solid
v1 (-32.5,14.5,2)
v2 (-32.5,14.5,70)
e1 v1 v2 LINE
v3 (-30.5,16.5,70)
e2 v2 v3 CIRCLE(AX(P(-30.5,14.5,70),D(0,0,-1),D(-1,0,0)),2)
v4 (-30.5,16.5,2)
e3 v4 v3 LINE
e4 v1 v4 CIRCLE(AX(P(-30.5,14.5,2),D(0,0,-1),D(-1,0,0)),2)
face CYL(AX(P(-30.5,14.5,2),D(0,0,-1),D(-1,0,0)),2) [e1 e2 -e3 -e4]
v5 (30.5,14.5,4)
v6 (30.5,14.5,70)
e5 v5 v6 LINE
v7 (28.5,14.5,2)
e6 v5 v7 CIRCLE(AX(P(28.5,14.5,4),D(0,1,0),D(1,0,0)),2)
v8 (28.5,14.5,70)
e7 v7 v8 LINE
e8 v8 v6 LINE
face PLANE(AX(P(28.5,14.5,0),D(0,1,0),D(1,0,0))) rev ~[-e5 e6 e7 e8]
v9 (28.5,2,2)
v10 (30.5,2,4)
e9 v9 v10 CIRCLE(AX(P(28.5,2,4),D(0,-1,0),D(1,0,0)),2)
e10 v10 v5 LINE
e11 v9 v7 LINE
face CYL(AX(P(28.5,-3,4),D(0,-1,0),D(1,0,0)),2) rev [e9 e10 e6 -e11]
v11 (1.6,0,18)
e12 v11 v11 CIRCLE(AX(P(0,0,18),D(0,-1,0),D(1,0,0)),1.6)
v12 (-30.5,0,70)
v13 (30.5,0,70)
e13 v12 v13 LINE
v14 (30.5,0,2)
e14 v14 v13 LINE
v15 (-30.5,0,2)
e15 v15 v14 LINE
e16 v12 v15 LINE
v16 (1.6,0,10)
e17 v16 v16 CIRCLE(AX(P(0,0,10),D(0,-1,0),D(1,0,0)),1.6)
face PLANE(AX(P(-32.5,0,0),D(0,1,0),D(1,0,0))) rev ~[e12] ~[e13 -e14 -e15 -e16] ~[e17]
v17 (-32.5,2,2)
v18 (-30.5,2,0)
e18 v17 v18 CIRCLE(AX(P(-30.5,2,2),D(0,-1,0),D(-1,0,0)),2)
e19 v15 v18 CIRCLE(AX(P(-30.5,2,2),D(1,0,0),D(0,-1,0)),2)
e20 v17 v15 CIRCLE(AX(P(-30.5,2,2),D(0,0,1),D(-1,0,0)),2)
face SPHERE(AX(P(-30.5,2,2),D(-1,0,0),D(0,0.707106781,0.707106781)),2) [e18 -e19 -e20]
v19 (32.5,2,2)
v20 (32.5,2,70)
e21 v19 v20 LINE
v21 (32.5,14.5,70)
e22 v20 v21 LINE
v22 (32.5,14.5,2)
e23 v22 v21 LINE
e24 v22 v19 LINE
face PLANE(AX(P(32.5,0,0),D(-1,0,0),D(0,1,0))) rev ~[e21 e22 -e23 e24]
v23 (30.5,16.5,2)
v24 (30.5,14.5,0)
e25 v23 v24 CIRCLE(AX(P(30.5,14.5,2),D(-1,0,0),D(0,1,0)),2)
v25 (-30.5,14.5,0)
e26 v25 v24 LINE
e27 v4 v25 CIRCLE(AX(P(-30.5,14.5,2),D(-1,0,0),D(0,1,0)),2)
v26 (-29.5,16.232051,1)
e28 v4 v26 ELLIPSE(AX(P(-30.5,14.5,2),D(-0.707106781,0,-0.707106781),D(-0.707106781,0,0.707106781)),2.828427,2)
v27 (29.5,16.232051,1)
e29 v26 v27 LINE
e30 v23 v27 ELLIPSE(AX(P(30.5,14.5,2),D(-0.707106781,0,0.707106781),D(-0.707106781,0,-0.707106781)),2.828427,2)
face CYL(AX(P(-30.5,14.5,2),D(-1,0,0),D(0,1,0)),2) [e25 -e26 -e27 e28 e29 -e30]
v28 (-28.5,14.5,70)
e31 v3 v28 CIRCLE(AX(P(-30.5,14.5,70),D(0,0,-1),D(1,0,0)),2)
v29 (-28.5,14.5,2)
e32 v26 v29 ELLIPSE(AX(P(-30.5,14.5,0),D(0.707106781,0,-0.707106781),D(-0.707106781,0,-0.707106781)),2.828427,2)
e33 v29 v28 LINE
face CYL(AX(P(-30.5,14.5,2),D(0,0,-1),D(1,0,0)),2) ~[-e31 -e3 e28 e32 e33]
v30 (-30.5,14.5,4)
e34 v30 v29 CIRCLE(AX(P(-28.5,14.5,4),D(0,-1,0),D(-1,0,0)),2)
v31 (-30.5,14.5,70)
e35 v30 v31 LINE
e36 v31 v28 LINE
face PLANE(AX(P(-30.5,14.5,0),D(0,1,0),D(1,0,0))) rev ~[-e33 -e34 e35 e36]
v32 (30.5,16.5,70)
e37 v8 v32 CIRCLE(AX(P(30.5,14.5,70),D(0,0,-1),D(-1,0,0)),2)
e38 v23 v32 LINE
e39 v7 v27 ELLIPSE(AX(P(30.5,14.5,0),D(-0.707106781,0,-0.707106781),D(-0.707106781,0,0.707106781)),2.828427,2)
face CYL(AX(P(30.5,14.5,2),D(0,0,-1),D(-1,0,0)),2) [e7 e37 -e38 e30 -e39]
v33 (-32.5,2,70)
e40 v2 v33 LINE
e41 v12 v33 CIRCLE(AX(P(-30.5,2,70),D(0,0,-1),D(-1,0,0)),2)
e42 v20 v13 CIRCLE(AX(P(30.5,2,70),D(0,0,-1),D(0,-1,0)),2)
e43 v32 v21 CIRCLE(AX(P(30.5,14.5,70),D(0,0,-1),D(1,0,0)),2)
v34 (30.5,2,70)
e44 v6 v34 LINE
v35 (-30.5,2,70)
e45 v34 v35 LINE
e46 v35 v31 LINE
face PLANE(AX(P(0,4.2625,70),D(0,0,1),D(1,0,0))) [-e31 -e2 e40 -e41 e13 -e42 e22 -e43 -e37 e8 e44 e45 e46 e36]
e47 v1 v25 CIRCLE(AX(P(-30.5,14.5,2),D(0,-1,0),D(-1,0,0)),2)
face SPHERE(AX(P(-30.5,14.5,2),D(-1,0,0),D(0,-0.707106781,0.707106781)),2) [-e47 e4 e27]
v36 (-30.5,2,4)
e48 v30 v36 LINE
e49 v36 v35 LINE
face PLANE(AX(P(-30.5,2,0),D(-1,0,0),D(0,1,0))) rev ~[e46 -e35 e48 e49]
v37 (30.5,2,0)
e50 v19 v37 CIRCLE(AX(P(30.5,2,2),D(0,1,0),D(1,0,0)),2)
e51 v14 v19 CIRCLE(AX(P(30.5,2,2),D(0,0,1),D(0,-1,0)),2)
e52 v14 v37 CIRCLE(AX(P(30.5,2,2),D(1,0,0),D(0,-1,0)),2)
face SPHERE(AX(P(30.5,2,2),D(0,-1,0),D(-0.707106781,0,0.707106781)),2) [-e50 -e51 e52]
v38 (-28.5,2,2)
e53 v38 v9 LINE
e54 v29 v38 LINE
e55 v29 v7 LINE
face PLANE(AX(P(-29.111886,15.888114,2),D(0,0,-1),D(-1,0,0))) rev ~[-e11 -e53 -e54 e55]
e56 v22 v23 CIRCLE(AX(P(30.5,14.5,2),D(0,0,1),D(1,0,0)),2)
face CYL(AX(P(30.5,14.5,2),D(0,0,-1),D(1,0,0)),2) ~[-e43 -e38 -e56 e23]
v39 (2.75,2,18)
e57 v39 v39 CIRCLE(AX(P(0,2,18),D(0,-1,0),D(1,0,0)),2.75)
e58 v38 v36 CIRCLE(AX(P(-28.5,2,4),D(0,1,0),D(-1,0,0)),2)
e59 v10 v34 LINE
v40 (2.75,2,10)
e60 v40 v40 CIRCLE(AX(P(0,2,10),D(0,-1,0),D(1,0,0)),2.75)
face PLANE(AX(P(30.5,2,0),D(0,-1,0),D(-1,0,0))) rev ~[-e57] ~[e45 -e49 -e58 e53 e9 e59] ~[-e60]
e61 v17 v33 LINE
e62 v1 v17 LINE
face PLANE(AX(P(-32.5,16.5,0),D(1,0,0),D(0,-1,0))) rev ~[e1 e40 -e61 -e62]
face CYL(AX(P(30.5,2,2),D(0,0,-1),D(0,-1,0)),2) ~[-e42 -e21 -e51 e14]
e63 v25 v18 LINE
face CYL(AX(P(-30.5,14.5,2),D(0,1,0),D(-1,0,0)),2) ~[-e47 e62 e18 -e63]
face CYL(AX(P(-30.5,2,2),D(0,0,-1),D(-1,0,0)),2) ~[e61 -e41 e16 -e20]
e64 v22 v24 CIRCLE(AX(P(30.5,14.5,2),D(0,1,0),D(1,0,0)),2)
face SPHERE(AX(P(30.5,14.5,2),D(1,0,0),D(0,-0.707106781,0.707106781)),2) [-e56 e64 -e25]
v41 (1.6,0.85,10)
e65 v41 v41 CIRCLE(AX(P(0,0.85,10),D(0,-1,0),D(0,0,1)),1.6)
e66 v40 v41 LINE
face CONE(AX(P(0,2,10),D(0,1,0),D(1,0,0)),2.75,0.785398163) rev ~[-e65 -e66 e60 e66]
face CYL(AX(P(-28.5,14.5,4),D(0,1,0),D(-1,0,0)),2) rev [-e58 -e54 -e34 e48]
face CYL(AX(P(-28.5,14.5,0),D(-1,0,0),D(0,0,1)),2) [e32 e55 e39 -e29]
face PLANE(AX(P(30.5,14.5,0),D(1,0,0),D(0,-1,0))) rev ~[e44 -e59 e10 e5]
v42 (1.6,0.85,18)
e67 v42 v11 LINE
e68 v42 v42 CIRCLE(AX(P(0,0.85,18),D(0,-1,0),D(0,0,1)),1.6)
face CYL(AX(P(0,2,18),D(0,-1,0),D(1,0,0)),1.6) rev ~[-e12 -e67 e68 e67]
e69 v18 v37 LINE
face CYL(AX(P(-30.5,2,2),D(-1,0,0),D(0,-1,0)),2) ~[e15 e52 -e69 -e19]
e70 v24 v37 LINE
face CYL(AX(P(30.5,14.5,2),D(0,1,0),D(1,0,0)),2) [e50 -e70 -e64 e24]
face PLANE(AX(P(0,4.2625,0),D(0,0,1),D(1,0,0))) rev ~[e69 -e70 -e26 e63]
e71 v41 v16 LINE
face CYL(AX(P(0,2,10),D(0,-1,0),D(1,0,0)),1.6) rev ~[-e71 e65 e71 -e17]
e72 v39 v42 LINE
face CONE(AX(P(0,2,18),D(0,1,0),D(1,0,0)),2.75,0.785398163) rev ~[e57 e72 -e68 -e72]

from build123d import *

# Parameters (mm, degrees)
F0_DEPTH       = 70
F1_W           = 65
F1_H           = 16.5
F8_DEPTH       = 2
F2_T1_DEPTH    = 12.5
F2_T3_DEPTH    = 73
F2_T5_DEPTH    = 57
F2_T7_DEPTH    = 61
F2_S11_W       = 2.04
F2_S11_H       = 2.04
F2_T12_DEPTH   = 2.04
F2_S17_W       = 2.04
F2_S17_H       = 2.04
F2_T18_DEPTH   = 2.04
F2_S23_W       = 2.04
F2_S23_H       = 2.04
F2_T24_DEPTH   = 2.04
F2_S29_W       = 2.04
F2_S29_H       = 2.04
F2_T30_DEPTH   = 2.04
F2_T37_DEPTH   = 73
F2_T42_DEPTH   = 62
F2_T50_DEPTH   = 62
F2_T55_DEPTH   = 73
F2_T62_DEPTH   = 17.5
F2_T67_DEPTH   = 17.5
F5_D           = 3.2
F5_CSINK_D     = 5.5
F5_CSINK_ANGLE = 90
F6_D           = 3.2
F6_CSINK_D     = 5.5
F6_CSINK_ANGLE = 90


# Not quite as in the source:
# - a fillet or chamfer that OpenCascade refuses, or shapes differently, is made with other operations: its cross-section is extruded or revolved along the edge and cut away or added
# - a feature names something its author has since deleted; it is built from what else it names


with BuildPart() as f0:
    # F7 (on Top) → F0 (new body)
    with BuildSketch(Plane.XY):
        Polygon((-32.5, 16.5), (-32.5, 0), (32.5, 0), (32.5, 16.5), (28.5, 16.5), (28.5, 14.5), (30.5, 14.5), (30.5, 2), (-30.5, 2), (-30.5, 14.5), (-28.5, 14.5), (-28.5, 16.5), align=None)
    extrude(amount=F0_DEPTH)

    # F1 (on face) → F8 (join)
    with BuildSketch(Plane(origin=(0, 0, 0), x_dir=(1, 0, 0), z_dir=(0, 0, -1))):
        with Locations((0, -8.25)):
            Rectangle(F1_W, F1_H)
    extrude(amount=-F8_DEPTH)

    # F2: fillet of radius 2 on 13 edges, made by hand

    # F2_s2 → F2_t1 (cut)
    with BuildSketch(Plane.XZ.offset(-14.5)):
        with BuildLine():
            ThreePointArc((32.5, 2), (31.9142135624, 0.5857864376), (30.5, 0))
            Line((30.5, 0), (32.5, 0))
            Line((32.5, 0), (32.5, 2))
        make_face()
        with BuildLine():
            ThreePointArc((-32.5, 2), (-31.9142135624, 0.5857864376), (-30.5, 0))
            Line((-30.5, 0), (-32.5, 0))
            Line((-32.5, 0), (-32.5, 2))
        make_face()
    extrude(amount=F2_T1_DEPTH, mode=Mode.SUBTRACT)

    # F2_s4 → F2_t3 (cut)
    with BuildSketch(Plane.XY.offset(2)):
        with BuildLine():
            ThreePointArc((-32.5, 2), (-31.9142135624, 0.5857864376), (-30.5, 0))
            Line((-30.5, 0), (-32.5, 0))
            Line((-32.5, 0), (-32.5, 2))
        make_face()
        with BuildLine():
            ThreePointArc((30.5, 0), (31.9142135624, 0.5857864376), (32.5, 2))
            Line((32.5, 2), (32.5, 0))
            Line((32.5, 0), (30.5, 0))
        make_face()
        with BuildLine():
            ThreePointArc((-32.5, 14.5), (-31.9142135624, 15.9142135624), (-30.5, 16.5))
            Line((-30.5, 16.5), (-32.5, 16.5))
            Line((-32.5, 16.5), (-32.5, 14.5))
        make_face()
        with BuildLine():
            ThreePointArc((32.5, 14.5), (31.9142135624, 15.9142135624), (30.5, 16.5))
            Line((30.5, 16.5), (32.5, 16.5))
            Line((32.5, 16.5), (32.5, 14.5))
        make_face()
        with BuildLine():
            ThreePointArc((-28.5, 14.5), (-29.0857864376, 15.9142135624), (-30.5, 16.5))
            Line((-30.5, 16.5), (-28.5, 16.5))
            Line((-28.5, 16.5), (-28.5, 14.5))
        make_face()
        with BuildLine():
            ThreePointArc((28.5, 14.5), (29.0857864376, 15.9142135624), (30.5, 16.5))
            Line((30.5, 16.5), (28.5, 16.5))
            Line((28.5, 16.5), (28.5, 14.5))
        make_face()
    extrude(amount=F2_T3_DEPTH, mode=Mode.SUBTRACT)

    # F2_s6 → F2_t5 (cut)
    with BuildSketch(Plane.YZ.offset(-28.5)):
        with BuildLine():
            ThreePointArc((14.5, 2), (15.9142135624, 1.4142135624), (16.5, 0))
            Line((16.5, 0), (16.5, 2))
            Line((16.5, 2), (14.5, 2))
        make_face()
    extrude(amount=F2_T5_DEPTH, mode=Mode.SUBTRACT)

    # F2_s8 → F2_t7 (cut)
    with BuildSketch(Plane.YZ.offset(-30.5)):
        with BuildLine():
            ThreePointArc((0, 2), (0.5857864376, 0.5857864376), (2, 0))
            Line((2, 0), (0, 0))
            Line((0, 0), (0, 2))
        make_face()
        with BuildLine():
            ThreePointArc((16.5, 2), (15.9142135624, 0.5857864376), (14.5, 0))
            Line((14.5, 0), (16.5, 0))
            Line((16.5, 0), (16.5, 2))
        make_face()
    extrude(amount=F2_T7_DEPTH, mode=Mode.SUBTRACT)


with BuildPart() as f2_tool10:
    # F2_s11 → F2_t12 (new body)
    with BuildSketch(Plane.XZ.offset(-2)):
        with Locations((31.52, 0.98)):
            Rectangle(F2_S11_W, F2_S11_H)
    extrude(amount=F2_T12_DEPTH)

    # F2_s13 → F2_t14 (revolve, cut)
    with BuildSketch(Plane(origin=(30.5, 2, 2), x_dir=(-0.7071067812, 0, 0.7071067812), z_dir=(0.7071067812, 0, 0.7071067812))):
        with BuildLine():
            ThreePointArc((0, -2), (2, 0), (0, 2))
            Line((0, 2), (0, -2))
        make_face()
    revolve(axis=Axis((30.5, 2, 2), (0, -1, 0)), mode=Mode.SUBTRACT)


with BuildPart() as f0_1:
    add(f0.part)

    # F2_t9: cut F2_tool10
    add(f2_tool10.part, mode=Mode.SUBTRACT)


with BuildPart() as f2_tool16:
    # F2_s17 → F2_t18 (new body)
    with BuildSketch(Plane.YZ.offset(30.5)):
        with Locations((15.52, 0.98)):
            Rectangle(F2_S17_W, F2_S17_H)
    extrude(amount=F2_T18_DEPTH)

    # F2_s19 → F2_t20 (revolve, cut)
    with BuildSketch(Plane(origin=(30.5, 14.5, 2), x_dir=(0, -0.7071067812, 0.7071067812), z_dir=(0, 0.7071067812, 0.7071067812))):
        with BuildLine():
            ThreePointArc((0, -2), (2, 0), (0, 2))
            Line((0, 2), (0, -2))
        make_face()
    revolve(axis=Axis((30.5, 14.5, 2), (1, 0, 0)), mode=Mode.SUBTRACT)


with BuildPart() as f0_2:
    add(f0_1.part)

    # F2_t15: cut F2_tool16
    add(f2_tool16.part, mode=Mode.SUBTRACT)


with BuildPart() as f2_tool22:
    # F2_s23 → F2_t24 (new body)
    with BuildSketch(Plane.YZ.offset(-30.5)):
        with Locations((15.52, 0.98)):
            Rectangle(F2_S23_W, F2_S23_H)
    extrude(amount=-F2_T24_DEPTH)

    # F2_s25 → F2_t26 (revolve, cut)
    with BuildSketch(Plane(origin=(-30.5, 14.5, 2), x_dir=(0, -0.7071067812, 0.7071067812), z_dir=(0, -0.7071067812, -0.7071067812))):
        with BuildLine():
            ThreePointArc((0, -2), (2, 0), (0, 2))
            Line((0, 2), (0, -2))
        make_face()
    revolve(axis=Axis((-30.5, 14.5, 2), (-1, 0, 0)), mode=Mode.SUBTRACT)


with BuildPart() as f0_3:
    add(f0_2.part)

    # F2_t21: cut F2_tool22
    add(f2_tool22.part, mode=Mode.SUBTRACT)


with BuildPart() as f2_tool28:
    # F2_s29 → F2_t30 (new body)
    with BuildSketch(Plane.YZ.offset(-30.5)):
        with Locations((0.98, 0.98)):
            Rectangle(F2_S29_W, F2_S29_H)
    extrude(amount=-F2_T30_DEPTH)

    # F2_s31 → F2_t32 (revolve, cut)
    with BuildSketch(Plane(origin=(-30.5, 2, 2), x_dir=(0, 0.7071067812, 0.7071067812), z_dir=(0, -0.7071067812, 0.7071067812))):
        with BuildLine():
            ThreePointArc((0, -2), (2, 0), (0, 2))
            Line((0, 2), (0, -2))
        make_face()
    revolve(axis=Axis((-30.5, 2, 2), (-1, 0, 0)), mode=Mode.SUBTRACT)


with BuildPart() as f0_4:
    add(f0_3.part)

    # F2_t27: cut F2_tool28
    add(f2_tool28.part, mode=Mode.SUBTRACT)


with BuildPart() as f2_tool35:
    # F2_s36 → F2_t37 (new body)
    with BuildSketch(Plane.XY.offset(-3)):
        with BuildLine():
            ThreePointArc((-28.5, 14.5), (-29.0857864376, 15.9142135624), (-30.5, 16.5))
            Line((-30.5, 16.5), (-28.5, 16.5))
            Line((-28.5, 16.5), (-28.5, 14.5))
        make_face()
    extrude(amount=F2_T37_DEPTH)

    split(bisect_by=Plane.XY.offset(2), keep=Keep.BOTTOM)

    split(bisect_by=Plane.XY, keep=Keep.TOP)


with BuildPart() as f2_tool40:
    # F2_s41 → F2_t42 (new body)
    with BuildSketch(Plane.YZ.offset(-33.5)):
        with BuildLine():
            ThreePointArc((14.5, 2), (15.9142135624, 1.4142135624), (16.5, 0))
            Line((16.5, 0), (16.5, 2))
            Line((16.5, 2), (14.5, 2))
        make_face()
    extrude(amount=F2_T42_DEPTH)

    split(bisect_by=Plane.YZ.offset(-28.5), keep=Keep.BOTTOM)

    split(bisect_by=Plane.YZ.offset(-30.5), keep=Keep.TOP)


with BuildPart() as f2_tool35_1:
    add(f2_tool35.part)

    # F2_t45: intersect F2_tool40
    add(f2_tool40.part, mode=Mode.INTERSECT)


with BuildPart() as f0_5:
    add(f0_4.part)

    # F2_t33: cut F2_tool35
    add(f2_tool35_1.part, mode=Mode.SUBTRACT)


with BuildPart() as f2_tool48:
    # F2_s49 → F2_t50 (new body)
    with BuildSketch(Plane.YZ.offset(-28.5)):
        with BuildLine():
            ThreePointArc((14.5, 2), (15.9142135624, 1.4142135624), (16.5, 0))
            Line((16.5, 0), (16.5, 2))
            Line((16.5, 2), (14.5, 2))
        make_face()
    extrude(amount=F2_T50_DEPTH)

    split(bisect_by=Plane.YZ.offset(30.5), keep=Keep.BOTTOM)

    split(bisect_by=Plane.YZ.offset(28.5), keep=Keep.TOP)


with BuildPart() as f2_tool53:
    # F2_s54 → F2_t55 (new body)
    with BuildSketch(Plane.XY.offset(-3)):
        with BuildLine():
            ThreePointArc((28.5, 14.5), (29.0857864376, 15.9142135624), (30.5, 16.5))
            Line((30.5, 16.5), (28.5, 16.5))
            Line((28.5, 16.5), (28.5, 14.5))
        make_face()
    extrude(amount=F2_T55_DEPTH)

    split(bisect_by=Plane.XY.offset(2), keep=Keep.BOTTOM)

    split(bisect_by=Plane.XY, keep=Keep.TOP)


with BuildPart() as f2_tool48_1:
    add(f2_tool48.part)

    # F2_t58: intersect F2_tool53
    add(f2_tool53.part, mode=Mode.INTERSECT)


with BuildPart() as f0_6:
    add(f0_5.part)

    # F2_t46: cut F2_tool48
    add(f2_tool48_1.part, mode=Mode.SUBTRACT)


with BuildPart() as f2_tool60:
    # F2_s61 → F2_t62 (new body)
    with BuildSketch(Plane.XZ.offset(3)):
        with BuildLine():
            ThreePointArc((30.5, 4), (29.9142135624, 2.5857864376), (28.5, 2))
            Line((28.5, 2), (30.5, 2))
            Line((30.5, 2), (30.5, 4))
        make_face()
    extrude(amount=-F2_T62_DEPTH)

    split(bisect_by=Plane.XZ, keep=Keep.BOTTOM)


with BuildPart() as f0_7:
    add(f0_6.part)

    # F2_t59: union F2_tool60
    add(f2_tool60.part)


with BuildPart() as f2_tool65:
    # F2_s66 → F2_t67 (new body)
    with BuildSketch(Plane.XZ.offset(-14.5)):
        with BuildLine():
            ThreePointArc((-30.5, 4), (-29.9142135624, 2.5857864376), (-28.5, 2))
            Line((-28.5, 2), (-30.5, 2))
            Line((-30.5, 2), (-30.5, 4))
        make_face()
    extrude(amount=F2_T67_DEPTH)

    split(bisect_by=Plane.XZ, keep=Keep.BOTTOM)


with BuildPart() as f0_8:
    add(f0_7.part)

    # F2_t64: union F2_tool65
    add(f2_tool65.part)

    # F5 (through all)
    with Locations(Plane(origin=(0, 2, 0), x_dir=(-1, 0, 0), z_dir=(0, 1, 0))):
        with Locations((0, 18)):
            CounterSinkHole(F5_D / 2, F5_CSINK_D / 2, counter_sink_angle=F5_CSINK_ANGLE)

    # F6 (through all)
    with Locations(Plane(origin=(0, 2, 0), x_dir=(-1, 0, 0), z_dir=(0, 1, 0))):
        with Locations((0, 10)):
            CounterSinkHole(F6_D / 2, F6_CSINK_D / 2, counter_sink_angle=F6_CSINK_ANGLE)


solid = f0_8.part
